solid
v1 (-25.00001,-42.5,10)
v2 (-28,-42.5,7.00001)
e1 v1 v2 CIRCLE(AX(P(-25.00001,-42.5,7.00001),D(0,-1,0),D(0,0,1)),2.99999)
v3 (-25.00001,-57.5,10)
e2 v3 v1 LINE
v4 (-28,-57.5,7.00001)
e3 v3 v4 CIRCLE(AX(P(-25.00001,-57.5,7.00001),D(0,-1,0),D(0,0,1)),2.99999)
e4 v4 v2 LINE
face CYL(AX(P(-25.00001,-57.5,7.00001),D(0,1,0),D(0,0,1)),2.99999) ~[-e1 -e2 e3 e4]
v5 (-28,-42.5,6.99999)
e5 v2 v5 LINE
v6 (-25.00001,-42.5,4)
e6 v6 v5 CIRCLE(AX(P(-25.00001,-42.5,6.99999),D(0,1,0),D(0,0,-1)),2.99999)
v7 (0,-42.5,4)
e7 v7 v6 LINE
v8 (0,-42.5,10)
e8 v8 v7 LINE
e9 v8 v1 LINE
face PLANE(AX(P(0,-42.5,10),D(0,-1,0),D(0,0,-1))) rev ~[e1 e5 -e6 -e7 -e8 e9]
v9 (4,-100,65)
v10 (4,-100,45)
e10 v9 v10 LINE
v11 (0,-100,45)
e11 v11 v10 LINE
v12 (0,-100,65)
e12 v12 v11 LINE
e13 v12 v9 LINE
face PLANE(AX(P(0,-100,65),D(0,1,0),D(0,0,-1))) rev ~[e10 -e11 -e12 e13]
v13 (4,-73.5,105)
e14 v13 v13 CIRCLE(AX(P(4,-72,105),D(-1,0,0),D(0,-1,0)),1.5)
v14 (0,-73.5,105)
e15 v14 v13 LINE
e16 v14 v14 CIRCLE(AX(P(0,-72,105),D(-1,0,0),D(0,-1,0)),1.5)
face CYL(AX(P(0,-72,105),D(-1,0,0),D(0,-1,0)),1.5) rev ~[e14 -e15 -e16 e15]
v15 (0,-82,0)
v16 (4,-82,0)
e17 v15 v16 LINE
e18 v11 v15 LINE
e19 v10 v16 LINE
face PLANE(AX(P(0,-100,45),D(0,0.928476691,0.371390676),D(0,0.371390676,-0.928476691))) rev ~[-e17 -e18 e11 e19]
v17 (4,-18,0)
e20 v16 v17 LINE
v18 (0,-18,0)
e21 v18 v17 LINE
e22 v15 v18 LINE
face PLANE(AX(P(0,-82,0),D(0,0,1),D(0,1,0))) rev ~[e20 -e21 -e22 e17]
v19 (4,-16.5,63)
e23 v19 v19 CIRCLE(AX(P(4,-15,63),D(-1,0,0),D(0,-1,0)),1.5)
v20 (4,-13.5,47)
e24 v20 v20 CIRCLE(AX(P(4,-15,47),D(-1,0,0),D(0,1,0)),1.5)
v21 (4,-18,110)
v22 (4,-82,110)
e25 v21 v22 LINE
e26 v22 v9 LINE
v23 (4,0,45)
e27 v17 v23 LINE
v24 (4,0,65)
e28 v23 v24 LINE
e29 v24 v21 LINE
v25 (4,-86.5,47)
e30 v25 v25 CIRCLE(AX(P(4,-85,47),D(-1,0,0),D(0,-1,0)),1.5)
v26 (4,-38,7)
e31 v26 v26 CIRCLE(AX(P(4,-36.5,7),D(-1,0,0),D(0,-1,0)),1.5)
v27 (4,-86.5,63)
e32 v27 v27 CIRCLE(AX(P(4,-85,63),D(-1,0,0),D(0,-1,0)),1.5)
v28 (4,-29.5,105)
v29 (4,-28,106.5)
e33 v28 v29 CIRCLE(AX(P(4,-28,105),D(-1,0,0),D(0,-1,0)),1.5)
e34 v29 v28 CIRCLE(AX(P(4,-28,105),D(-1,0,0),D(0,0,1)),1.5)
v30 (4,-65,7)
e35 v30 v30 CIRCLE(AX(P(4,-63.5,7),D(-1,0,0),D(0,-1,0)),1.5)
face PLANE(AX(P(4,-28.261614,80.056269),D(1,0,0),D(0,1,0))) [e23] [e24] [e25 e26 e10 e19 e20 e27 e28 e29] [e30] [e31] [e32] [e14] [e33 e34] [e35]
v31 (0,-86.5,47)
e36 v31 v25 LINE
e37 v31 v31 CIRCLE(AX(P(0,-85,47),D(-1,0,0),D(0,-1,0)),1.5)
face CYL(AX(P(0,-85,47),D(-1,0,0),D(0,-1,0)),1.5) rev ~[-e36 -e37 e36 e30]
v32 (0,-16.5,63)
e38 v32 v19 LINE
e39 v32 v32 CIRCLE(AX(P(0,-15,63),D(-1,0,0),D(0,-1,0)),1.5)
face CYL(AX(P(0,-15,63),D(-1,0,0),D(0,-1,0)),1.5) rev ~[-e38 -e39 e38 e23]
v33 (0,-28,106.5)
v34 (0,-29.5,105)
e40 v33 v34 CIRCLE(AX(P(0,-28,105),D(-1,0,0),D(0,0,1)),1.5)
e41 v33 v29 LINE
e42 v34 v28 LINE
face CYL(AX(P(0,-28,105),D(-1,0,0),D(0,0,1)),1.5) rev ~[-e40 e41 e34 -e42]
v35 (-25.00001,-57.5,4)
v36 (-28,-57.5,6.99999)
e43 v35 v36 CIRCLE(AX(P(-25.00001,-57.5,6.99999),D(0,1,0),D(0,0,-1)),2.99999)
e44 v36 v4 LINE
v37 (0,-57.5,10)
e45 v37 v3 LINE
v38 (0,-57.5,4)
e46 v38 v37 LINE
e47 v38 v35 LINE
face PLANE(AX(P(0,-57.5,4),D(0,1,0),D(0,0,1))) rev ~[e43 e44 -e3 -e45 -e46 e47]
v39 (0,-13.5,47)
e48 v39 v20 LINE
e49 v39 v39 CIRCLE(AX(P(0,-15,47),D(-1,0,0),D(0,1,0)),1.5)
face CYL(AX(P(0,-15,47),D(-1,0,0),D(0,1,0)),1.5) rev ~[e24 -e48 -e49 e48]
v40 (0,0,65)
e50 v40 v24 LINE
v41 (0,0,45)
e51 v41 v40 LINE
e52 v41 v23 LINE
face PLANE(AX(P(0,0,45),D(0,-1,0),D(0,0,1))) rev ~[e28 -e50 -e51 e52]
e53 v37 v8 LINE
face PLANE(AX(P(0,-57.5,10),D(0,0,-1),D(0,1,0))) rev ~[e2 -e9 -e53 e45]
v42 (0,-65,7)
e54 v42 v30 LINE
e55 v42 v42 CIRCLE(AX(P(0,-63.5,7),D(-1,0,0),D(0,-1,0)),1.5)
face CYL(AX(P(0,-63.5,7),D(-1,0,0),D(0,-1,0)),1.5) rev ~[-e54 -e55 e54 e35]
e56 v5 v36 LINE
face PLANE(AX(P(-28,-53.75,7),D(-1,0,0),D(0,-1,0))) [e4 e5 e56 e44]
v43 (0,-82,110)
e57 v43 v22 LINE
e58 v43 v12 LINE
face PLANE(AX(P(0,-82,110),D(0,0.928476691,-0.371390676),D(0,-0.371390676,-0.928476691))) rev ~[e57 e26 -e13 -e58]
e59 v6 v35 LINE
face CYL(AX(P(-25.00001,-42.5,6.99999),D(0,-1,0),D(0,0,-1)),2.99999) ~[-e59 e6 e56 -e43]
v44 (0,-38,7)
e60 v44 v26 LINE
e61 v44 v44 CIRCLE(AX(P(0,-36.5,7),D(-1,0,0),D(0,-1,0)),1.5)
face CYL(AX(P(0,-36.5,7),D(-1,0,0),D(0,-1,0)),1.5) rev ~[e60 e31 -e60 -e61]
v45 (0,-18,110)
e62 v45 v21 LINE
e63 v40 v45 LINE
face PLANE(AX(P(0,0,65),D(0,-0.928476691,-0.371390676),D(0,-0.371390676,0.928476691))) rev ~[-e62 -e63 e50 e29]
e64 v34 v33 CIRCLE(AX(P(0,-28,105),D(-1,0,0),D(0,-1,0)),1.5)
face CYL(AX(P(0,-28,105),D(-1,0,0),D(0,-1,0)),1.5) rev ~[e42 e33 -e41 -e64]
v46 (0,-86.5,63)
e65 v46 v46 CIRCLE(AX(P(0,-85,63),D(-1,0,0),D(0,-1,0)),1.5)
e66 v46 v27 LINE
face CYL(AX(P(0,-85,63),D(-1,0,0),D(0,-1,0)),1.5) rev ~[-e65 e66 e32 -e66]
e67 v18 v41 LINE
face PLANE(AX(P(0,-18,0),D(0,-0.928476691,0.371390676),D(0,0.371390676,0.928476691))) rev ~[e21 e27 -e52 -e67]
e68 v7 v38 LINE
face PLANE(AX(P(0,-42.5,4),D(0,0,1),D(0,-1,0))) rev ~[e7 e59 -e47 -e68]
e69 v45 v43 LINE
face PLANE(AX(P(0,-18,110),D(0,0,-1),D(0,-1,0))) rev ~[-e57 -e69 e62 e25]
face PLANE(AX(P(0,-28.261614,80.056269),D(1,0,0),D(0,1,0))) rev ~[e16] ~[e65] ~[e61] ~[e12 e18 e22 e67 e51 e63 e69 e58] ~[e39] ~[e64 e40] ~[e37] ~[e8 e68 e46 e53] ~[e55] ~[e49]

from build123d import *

# Parameters (mm, degrees)
F1_DEPTH = 4
F2_W     = 7.5
F2_H     = 6
F3_DEPTH = 28
F4_R     = 2.99999
F2_R     = 1.5
F5_DEPTH = 25


# Not quite as in the source:
# - a fillet or chamfer is up to 0.001 mm smaller than in the source, because OpenCascade refuses the exact size


with BuildPart() as f1:
    # F0 (on Right) → F1 (new body)
    with BuildSketch(Plane.YZ):
        Polygon((-50, 55), (0, 55), (0, 65), (-18, 110), (-50, 110), align=None)
        Polygon((-50, 0), (-18, 0), (0, 45), (0, 55), (-50, 55), align=None)
        Polygon((-100, 55), (-50, 55), (-50, 110), (-82, 110), (-100, 65), align=None)
        Polygon((-82, 0), (-50, 0), (-50, 55), (-100, 55), (-100, 45), align=None)
    extrude(amount=F1_DEPTH)

    # F2 (on face) → F3 (join)
    with BuildSketch(Plane(origin=(0, 0, 0), x_dir=(0, -1, 0), z_dir=(-1, 0, 0))):
        with Locations((53.75, 7)):
            Rectangle(F2_W, F2_H)
        Polygon((42.5, 4), (50, 4), (50, 10), (42.5, 10), (42.5, 7), align=None)
    extrude(amount=F3_DEPTH)

    # F4 (radius 3 in the source; OpenCascade refuses exactly that, so slightly less here)
    f4_edges = [f1.edges().sort_by_distance(p)[0] for p in [
        (-28, -50, 4),
        (-28, -50, 10),
    ]]
    fillet(f4_edges, radius=F4_R)

    # F2 (on face) → F5 (cut)
    with BuildSketch(Plane(origin=(0, 0, 0), x_dir=(0, -1, 0), z_dir=(-1, 0, 0))):
        with Locations((72, 105)):
            Circle(F2_R)
        with Locations((85, 63)):
            Circle(F2_R)
        with Locations((85, 47)):
            Circle(F2_R)
        with Locations((15, 63)):
            Circle(F2_R)
        with BuildLine():
            ThreePointArc((16.5, 47), (15, 48.5), (13.5, 47))
            ThreePointArc((13.5, 47), (15, 45.5), (16.5, 47))
        make_face()
        with BuildLine():
            ThreePointArc((29.5, 105), (29.0606601718, 106.0606601718), (28, 106.5))
            ThreePointArc((28, 106.5), (26.9393398282, 103.9393398282), (29.5, 105))
        make_face()
        with Locations((63.5, 7)):
            Circle(F2_R)
        with Locations((36.5, 7)):
            Circle(F2_R)
    extrude(amount=-F5_DEPTH, mode=Mode.SUBTRACT)


solid = f1.part
